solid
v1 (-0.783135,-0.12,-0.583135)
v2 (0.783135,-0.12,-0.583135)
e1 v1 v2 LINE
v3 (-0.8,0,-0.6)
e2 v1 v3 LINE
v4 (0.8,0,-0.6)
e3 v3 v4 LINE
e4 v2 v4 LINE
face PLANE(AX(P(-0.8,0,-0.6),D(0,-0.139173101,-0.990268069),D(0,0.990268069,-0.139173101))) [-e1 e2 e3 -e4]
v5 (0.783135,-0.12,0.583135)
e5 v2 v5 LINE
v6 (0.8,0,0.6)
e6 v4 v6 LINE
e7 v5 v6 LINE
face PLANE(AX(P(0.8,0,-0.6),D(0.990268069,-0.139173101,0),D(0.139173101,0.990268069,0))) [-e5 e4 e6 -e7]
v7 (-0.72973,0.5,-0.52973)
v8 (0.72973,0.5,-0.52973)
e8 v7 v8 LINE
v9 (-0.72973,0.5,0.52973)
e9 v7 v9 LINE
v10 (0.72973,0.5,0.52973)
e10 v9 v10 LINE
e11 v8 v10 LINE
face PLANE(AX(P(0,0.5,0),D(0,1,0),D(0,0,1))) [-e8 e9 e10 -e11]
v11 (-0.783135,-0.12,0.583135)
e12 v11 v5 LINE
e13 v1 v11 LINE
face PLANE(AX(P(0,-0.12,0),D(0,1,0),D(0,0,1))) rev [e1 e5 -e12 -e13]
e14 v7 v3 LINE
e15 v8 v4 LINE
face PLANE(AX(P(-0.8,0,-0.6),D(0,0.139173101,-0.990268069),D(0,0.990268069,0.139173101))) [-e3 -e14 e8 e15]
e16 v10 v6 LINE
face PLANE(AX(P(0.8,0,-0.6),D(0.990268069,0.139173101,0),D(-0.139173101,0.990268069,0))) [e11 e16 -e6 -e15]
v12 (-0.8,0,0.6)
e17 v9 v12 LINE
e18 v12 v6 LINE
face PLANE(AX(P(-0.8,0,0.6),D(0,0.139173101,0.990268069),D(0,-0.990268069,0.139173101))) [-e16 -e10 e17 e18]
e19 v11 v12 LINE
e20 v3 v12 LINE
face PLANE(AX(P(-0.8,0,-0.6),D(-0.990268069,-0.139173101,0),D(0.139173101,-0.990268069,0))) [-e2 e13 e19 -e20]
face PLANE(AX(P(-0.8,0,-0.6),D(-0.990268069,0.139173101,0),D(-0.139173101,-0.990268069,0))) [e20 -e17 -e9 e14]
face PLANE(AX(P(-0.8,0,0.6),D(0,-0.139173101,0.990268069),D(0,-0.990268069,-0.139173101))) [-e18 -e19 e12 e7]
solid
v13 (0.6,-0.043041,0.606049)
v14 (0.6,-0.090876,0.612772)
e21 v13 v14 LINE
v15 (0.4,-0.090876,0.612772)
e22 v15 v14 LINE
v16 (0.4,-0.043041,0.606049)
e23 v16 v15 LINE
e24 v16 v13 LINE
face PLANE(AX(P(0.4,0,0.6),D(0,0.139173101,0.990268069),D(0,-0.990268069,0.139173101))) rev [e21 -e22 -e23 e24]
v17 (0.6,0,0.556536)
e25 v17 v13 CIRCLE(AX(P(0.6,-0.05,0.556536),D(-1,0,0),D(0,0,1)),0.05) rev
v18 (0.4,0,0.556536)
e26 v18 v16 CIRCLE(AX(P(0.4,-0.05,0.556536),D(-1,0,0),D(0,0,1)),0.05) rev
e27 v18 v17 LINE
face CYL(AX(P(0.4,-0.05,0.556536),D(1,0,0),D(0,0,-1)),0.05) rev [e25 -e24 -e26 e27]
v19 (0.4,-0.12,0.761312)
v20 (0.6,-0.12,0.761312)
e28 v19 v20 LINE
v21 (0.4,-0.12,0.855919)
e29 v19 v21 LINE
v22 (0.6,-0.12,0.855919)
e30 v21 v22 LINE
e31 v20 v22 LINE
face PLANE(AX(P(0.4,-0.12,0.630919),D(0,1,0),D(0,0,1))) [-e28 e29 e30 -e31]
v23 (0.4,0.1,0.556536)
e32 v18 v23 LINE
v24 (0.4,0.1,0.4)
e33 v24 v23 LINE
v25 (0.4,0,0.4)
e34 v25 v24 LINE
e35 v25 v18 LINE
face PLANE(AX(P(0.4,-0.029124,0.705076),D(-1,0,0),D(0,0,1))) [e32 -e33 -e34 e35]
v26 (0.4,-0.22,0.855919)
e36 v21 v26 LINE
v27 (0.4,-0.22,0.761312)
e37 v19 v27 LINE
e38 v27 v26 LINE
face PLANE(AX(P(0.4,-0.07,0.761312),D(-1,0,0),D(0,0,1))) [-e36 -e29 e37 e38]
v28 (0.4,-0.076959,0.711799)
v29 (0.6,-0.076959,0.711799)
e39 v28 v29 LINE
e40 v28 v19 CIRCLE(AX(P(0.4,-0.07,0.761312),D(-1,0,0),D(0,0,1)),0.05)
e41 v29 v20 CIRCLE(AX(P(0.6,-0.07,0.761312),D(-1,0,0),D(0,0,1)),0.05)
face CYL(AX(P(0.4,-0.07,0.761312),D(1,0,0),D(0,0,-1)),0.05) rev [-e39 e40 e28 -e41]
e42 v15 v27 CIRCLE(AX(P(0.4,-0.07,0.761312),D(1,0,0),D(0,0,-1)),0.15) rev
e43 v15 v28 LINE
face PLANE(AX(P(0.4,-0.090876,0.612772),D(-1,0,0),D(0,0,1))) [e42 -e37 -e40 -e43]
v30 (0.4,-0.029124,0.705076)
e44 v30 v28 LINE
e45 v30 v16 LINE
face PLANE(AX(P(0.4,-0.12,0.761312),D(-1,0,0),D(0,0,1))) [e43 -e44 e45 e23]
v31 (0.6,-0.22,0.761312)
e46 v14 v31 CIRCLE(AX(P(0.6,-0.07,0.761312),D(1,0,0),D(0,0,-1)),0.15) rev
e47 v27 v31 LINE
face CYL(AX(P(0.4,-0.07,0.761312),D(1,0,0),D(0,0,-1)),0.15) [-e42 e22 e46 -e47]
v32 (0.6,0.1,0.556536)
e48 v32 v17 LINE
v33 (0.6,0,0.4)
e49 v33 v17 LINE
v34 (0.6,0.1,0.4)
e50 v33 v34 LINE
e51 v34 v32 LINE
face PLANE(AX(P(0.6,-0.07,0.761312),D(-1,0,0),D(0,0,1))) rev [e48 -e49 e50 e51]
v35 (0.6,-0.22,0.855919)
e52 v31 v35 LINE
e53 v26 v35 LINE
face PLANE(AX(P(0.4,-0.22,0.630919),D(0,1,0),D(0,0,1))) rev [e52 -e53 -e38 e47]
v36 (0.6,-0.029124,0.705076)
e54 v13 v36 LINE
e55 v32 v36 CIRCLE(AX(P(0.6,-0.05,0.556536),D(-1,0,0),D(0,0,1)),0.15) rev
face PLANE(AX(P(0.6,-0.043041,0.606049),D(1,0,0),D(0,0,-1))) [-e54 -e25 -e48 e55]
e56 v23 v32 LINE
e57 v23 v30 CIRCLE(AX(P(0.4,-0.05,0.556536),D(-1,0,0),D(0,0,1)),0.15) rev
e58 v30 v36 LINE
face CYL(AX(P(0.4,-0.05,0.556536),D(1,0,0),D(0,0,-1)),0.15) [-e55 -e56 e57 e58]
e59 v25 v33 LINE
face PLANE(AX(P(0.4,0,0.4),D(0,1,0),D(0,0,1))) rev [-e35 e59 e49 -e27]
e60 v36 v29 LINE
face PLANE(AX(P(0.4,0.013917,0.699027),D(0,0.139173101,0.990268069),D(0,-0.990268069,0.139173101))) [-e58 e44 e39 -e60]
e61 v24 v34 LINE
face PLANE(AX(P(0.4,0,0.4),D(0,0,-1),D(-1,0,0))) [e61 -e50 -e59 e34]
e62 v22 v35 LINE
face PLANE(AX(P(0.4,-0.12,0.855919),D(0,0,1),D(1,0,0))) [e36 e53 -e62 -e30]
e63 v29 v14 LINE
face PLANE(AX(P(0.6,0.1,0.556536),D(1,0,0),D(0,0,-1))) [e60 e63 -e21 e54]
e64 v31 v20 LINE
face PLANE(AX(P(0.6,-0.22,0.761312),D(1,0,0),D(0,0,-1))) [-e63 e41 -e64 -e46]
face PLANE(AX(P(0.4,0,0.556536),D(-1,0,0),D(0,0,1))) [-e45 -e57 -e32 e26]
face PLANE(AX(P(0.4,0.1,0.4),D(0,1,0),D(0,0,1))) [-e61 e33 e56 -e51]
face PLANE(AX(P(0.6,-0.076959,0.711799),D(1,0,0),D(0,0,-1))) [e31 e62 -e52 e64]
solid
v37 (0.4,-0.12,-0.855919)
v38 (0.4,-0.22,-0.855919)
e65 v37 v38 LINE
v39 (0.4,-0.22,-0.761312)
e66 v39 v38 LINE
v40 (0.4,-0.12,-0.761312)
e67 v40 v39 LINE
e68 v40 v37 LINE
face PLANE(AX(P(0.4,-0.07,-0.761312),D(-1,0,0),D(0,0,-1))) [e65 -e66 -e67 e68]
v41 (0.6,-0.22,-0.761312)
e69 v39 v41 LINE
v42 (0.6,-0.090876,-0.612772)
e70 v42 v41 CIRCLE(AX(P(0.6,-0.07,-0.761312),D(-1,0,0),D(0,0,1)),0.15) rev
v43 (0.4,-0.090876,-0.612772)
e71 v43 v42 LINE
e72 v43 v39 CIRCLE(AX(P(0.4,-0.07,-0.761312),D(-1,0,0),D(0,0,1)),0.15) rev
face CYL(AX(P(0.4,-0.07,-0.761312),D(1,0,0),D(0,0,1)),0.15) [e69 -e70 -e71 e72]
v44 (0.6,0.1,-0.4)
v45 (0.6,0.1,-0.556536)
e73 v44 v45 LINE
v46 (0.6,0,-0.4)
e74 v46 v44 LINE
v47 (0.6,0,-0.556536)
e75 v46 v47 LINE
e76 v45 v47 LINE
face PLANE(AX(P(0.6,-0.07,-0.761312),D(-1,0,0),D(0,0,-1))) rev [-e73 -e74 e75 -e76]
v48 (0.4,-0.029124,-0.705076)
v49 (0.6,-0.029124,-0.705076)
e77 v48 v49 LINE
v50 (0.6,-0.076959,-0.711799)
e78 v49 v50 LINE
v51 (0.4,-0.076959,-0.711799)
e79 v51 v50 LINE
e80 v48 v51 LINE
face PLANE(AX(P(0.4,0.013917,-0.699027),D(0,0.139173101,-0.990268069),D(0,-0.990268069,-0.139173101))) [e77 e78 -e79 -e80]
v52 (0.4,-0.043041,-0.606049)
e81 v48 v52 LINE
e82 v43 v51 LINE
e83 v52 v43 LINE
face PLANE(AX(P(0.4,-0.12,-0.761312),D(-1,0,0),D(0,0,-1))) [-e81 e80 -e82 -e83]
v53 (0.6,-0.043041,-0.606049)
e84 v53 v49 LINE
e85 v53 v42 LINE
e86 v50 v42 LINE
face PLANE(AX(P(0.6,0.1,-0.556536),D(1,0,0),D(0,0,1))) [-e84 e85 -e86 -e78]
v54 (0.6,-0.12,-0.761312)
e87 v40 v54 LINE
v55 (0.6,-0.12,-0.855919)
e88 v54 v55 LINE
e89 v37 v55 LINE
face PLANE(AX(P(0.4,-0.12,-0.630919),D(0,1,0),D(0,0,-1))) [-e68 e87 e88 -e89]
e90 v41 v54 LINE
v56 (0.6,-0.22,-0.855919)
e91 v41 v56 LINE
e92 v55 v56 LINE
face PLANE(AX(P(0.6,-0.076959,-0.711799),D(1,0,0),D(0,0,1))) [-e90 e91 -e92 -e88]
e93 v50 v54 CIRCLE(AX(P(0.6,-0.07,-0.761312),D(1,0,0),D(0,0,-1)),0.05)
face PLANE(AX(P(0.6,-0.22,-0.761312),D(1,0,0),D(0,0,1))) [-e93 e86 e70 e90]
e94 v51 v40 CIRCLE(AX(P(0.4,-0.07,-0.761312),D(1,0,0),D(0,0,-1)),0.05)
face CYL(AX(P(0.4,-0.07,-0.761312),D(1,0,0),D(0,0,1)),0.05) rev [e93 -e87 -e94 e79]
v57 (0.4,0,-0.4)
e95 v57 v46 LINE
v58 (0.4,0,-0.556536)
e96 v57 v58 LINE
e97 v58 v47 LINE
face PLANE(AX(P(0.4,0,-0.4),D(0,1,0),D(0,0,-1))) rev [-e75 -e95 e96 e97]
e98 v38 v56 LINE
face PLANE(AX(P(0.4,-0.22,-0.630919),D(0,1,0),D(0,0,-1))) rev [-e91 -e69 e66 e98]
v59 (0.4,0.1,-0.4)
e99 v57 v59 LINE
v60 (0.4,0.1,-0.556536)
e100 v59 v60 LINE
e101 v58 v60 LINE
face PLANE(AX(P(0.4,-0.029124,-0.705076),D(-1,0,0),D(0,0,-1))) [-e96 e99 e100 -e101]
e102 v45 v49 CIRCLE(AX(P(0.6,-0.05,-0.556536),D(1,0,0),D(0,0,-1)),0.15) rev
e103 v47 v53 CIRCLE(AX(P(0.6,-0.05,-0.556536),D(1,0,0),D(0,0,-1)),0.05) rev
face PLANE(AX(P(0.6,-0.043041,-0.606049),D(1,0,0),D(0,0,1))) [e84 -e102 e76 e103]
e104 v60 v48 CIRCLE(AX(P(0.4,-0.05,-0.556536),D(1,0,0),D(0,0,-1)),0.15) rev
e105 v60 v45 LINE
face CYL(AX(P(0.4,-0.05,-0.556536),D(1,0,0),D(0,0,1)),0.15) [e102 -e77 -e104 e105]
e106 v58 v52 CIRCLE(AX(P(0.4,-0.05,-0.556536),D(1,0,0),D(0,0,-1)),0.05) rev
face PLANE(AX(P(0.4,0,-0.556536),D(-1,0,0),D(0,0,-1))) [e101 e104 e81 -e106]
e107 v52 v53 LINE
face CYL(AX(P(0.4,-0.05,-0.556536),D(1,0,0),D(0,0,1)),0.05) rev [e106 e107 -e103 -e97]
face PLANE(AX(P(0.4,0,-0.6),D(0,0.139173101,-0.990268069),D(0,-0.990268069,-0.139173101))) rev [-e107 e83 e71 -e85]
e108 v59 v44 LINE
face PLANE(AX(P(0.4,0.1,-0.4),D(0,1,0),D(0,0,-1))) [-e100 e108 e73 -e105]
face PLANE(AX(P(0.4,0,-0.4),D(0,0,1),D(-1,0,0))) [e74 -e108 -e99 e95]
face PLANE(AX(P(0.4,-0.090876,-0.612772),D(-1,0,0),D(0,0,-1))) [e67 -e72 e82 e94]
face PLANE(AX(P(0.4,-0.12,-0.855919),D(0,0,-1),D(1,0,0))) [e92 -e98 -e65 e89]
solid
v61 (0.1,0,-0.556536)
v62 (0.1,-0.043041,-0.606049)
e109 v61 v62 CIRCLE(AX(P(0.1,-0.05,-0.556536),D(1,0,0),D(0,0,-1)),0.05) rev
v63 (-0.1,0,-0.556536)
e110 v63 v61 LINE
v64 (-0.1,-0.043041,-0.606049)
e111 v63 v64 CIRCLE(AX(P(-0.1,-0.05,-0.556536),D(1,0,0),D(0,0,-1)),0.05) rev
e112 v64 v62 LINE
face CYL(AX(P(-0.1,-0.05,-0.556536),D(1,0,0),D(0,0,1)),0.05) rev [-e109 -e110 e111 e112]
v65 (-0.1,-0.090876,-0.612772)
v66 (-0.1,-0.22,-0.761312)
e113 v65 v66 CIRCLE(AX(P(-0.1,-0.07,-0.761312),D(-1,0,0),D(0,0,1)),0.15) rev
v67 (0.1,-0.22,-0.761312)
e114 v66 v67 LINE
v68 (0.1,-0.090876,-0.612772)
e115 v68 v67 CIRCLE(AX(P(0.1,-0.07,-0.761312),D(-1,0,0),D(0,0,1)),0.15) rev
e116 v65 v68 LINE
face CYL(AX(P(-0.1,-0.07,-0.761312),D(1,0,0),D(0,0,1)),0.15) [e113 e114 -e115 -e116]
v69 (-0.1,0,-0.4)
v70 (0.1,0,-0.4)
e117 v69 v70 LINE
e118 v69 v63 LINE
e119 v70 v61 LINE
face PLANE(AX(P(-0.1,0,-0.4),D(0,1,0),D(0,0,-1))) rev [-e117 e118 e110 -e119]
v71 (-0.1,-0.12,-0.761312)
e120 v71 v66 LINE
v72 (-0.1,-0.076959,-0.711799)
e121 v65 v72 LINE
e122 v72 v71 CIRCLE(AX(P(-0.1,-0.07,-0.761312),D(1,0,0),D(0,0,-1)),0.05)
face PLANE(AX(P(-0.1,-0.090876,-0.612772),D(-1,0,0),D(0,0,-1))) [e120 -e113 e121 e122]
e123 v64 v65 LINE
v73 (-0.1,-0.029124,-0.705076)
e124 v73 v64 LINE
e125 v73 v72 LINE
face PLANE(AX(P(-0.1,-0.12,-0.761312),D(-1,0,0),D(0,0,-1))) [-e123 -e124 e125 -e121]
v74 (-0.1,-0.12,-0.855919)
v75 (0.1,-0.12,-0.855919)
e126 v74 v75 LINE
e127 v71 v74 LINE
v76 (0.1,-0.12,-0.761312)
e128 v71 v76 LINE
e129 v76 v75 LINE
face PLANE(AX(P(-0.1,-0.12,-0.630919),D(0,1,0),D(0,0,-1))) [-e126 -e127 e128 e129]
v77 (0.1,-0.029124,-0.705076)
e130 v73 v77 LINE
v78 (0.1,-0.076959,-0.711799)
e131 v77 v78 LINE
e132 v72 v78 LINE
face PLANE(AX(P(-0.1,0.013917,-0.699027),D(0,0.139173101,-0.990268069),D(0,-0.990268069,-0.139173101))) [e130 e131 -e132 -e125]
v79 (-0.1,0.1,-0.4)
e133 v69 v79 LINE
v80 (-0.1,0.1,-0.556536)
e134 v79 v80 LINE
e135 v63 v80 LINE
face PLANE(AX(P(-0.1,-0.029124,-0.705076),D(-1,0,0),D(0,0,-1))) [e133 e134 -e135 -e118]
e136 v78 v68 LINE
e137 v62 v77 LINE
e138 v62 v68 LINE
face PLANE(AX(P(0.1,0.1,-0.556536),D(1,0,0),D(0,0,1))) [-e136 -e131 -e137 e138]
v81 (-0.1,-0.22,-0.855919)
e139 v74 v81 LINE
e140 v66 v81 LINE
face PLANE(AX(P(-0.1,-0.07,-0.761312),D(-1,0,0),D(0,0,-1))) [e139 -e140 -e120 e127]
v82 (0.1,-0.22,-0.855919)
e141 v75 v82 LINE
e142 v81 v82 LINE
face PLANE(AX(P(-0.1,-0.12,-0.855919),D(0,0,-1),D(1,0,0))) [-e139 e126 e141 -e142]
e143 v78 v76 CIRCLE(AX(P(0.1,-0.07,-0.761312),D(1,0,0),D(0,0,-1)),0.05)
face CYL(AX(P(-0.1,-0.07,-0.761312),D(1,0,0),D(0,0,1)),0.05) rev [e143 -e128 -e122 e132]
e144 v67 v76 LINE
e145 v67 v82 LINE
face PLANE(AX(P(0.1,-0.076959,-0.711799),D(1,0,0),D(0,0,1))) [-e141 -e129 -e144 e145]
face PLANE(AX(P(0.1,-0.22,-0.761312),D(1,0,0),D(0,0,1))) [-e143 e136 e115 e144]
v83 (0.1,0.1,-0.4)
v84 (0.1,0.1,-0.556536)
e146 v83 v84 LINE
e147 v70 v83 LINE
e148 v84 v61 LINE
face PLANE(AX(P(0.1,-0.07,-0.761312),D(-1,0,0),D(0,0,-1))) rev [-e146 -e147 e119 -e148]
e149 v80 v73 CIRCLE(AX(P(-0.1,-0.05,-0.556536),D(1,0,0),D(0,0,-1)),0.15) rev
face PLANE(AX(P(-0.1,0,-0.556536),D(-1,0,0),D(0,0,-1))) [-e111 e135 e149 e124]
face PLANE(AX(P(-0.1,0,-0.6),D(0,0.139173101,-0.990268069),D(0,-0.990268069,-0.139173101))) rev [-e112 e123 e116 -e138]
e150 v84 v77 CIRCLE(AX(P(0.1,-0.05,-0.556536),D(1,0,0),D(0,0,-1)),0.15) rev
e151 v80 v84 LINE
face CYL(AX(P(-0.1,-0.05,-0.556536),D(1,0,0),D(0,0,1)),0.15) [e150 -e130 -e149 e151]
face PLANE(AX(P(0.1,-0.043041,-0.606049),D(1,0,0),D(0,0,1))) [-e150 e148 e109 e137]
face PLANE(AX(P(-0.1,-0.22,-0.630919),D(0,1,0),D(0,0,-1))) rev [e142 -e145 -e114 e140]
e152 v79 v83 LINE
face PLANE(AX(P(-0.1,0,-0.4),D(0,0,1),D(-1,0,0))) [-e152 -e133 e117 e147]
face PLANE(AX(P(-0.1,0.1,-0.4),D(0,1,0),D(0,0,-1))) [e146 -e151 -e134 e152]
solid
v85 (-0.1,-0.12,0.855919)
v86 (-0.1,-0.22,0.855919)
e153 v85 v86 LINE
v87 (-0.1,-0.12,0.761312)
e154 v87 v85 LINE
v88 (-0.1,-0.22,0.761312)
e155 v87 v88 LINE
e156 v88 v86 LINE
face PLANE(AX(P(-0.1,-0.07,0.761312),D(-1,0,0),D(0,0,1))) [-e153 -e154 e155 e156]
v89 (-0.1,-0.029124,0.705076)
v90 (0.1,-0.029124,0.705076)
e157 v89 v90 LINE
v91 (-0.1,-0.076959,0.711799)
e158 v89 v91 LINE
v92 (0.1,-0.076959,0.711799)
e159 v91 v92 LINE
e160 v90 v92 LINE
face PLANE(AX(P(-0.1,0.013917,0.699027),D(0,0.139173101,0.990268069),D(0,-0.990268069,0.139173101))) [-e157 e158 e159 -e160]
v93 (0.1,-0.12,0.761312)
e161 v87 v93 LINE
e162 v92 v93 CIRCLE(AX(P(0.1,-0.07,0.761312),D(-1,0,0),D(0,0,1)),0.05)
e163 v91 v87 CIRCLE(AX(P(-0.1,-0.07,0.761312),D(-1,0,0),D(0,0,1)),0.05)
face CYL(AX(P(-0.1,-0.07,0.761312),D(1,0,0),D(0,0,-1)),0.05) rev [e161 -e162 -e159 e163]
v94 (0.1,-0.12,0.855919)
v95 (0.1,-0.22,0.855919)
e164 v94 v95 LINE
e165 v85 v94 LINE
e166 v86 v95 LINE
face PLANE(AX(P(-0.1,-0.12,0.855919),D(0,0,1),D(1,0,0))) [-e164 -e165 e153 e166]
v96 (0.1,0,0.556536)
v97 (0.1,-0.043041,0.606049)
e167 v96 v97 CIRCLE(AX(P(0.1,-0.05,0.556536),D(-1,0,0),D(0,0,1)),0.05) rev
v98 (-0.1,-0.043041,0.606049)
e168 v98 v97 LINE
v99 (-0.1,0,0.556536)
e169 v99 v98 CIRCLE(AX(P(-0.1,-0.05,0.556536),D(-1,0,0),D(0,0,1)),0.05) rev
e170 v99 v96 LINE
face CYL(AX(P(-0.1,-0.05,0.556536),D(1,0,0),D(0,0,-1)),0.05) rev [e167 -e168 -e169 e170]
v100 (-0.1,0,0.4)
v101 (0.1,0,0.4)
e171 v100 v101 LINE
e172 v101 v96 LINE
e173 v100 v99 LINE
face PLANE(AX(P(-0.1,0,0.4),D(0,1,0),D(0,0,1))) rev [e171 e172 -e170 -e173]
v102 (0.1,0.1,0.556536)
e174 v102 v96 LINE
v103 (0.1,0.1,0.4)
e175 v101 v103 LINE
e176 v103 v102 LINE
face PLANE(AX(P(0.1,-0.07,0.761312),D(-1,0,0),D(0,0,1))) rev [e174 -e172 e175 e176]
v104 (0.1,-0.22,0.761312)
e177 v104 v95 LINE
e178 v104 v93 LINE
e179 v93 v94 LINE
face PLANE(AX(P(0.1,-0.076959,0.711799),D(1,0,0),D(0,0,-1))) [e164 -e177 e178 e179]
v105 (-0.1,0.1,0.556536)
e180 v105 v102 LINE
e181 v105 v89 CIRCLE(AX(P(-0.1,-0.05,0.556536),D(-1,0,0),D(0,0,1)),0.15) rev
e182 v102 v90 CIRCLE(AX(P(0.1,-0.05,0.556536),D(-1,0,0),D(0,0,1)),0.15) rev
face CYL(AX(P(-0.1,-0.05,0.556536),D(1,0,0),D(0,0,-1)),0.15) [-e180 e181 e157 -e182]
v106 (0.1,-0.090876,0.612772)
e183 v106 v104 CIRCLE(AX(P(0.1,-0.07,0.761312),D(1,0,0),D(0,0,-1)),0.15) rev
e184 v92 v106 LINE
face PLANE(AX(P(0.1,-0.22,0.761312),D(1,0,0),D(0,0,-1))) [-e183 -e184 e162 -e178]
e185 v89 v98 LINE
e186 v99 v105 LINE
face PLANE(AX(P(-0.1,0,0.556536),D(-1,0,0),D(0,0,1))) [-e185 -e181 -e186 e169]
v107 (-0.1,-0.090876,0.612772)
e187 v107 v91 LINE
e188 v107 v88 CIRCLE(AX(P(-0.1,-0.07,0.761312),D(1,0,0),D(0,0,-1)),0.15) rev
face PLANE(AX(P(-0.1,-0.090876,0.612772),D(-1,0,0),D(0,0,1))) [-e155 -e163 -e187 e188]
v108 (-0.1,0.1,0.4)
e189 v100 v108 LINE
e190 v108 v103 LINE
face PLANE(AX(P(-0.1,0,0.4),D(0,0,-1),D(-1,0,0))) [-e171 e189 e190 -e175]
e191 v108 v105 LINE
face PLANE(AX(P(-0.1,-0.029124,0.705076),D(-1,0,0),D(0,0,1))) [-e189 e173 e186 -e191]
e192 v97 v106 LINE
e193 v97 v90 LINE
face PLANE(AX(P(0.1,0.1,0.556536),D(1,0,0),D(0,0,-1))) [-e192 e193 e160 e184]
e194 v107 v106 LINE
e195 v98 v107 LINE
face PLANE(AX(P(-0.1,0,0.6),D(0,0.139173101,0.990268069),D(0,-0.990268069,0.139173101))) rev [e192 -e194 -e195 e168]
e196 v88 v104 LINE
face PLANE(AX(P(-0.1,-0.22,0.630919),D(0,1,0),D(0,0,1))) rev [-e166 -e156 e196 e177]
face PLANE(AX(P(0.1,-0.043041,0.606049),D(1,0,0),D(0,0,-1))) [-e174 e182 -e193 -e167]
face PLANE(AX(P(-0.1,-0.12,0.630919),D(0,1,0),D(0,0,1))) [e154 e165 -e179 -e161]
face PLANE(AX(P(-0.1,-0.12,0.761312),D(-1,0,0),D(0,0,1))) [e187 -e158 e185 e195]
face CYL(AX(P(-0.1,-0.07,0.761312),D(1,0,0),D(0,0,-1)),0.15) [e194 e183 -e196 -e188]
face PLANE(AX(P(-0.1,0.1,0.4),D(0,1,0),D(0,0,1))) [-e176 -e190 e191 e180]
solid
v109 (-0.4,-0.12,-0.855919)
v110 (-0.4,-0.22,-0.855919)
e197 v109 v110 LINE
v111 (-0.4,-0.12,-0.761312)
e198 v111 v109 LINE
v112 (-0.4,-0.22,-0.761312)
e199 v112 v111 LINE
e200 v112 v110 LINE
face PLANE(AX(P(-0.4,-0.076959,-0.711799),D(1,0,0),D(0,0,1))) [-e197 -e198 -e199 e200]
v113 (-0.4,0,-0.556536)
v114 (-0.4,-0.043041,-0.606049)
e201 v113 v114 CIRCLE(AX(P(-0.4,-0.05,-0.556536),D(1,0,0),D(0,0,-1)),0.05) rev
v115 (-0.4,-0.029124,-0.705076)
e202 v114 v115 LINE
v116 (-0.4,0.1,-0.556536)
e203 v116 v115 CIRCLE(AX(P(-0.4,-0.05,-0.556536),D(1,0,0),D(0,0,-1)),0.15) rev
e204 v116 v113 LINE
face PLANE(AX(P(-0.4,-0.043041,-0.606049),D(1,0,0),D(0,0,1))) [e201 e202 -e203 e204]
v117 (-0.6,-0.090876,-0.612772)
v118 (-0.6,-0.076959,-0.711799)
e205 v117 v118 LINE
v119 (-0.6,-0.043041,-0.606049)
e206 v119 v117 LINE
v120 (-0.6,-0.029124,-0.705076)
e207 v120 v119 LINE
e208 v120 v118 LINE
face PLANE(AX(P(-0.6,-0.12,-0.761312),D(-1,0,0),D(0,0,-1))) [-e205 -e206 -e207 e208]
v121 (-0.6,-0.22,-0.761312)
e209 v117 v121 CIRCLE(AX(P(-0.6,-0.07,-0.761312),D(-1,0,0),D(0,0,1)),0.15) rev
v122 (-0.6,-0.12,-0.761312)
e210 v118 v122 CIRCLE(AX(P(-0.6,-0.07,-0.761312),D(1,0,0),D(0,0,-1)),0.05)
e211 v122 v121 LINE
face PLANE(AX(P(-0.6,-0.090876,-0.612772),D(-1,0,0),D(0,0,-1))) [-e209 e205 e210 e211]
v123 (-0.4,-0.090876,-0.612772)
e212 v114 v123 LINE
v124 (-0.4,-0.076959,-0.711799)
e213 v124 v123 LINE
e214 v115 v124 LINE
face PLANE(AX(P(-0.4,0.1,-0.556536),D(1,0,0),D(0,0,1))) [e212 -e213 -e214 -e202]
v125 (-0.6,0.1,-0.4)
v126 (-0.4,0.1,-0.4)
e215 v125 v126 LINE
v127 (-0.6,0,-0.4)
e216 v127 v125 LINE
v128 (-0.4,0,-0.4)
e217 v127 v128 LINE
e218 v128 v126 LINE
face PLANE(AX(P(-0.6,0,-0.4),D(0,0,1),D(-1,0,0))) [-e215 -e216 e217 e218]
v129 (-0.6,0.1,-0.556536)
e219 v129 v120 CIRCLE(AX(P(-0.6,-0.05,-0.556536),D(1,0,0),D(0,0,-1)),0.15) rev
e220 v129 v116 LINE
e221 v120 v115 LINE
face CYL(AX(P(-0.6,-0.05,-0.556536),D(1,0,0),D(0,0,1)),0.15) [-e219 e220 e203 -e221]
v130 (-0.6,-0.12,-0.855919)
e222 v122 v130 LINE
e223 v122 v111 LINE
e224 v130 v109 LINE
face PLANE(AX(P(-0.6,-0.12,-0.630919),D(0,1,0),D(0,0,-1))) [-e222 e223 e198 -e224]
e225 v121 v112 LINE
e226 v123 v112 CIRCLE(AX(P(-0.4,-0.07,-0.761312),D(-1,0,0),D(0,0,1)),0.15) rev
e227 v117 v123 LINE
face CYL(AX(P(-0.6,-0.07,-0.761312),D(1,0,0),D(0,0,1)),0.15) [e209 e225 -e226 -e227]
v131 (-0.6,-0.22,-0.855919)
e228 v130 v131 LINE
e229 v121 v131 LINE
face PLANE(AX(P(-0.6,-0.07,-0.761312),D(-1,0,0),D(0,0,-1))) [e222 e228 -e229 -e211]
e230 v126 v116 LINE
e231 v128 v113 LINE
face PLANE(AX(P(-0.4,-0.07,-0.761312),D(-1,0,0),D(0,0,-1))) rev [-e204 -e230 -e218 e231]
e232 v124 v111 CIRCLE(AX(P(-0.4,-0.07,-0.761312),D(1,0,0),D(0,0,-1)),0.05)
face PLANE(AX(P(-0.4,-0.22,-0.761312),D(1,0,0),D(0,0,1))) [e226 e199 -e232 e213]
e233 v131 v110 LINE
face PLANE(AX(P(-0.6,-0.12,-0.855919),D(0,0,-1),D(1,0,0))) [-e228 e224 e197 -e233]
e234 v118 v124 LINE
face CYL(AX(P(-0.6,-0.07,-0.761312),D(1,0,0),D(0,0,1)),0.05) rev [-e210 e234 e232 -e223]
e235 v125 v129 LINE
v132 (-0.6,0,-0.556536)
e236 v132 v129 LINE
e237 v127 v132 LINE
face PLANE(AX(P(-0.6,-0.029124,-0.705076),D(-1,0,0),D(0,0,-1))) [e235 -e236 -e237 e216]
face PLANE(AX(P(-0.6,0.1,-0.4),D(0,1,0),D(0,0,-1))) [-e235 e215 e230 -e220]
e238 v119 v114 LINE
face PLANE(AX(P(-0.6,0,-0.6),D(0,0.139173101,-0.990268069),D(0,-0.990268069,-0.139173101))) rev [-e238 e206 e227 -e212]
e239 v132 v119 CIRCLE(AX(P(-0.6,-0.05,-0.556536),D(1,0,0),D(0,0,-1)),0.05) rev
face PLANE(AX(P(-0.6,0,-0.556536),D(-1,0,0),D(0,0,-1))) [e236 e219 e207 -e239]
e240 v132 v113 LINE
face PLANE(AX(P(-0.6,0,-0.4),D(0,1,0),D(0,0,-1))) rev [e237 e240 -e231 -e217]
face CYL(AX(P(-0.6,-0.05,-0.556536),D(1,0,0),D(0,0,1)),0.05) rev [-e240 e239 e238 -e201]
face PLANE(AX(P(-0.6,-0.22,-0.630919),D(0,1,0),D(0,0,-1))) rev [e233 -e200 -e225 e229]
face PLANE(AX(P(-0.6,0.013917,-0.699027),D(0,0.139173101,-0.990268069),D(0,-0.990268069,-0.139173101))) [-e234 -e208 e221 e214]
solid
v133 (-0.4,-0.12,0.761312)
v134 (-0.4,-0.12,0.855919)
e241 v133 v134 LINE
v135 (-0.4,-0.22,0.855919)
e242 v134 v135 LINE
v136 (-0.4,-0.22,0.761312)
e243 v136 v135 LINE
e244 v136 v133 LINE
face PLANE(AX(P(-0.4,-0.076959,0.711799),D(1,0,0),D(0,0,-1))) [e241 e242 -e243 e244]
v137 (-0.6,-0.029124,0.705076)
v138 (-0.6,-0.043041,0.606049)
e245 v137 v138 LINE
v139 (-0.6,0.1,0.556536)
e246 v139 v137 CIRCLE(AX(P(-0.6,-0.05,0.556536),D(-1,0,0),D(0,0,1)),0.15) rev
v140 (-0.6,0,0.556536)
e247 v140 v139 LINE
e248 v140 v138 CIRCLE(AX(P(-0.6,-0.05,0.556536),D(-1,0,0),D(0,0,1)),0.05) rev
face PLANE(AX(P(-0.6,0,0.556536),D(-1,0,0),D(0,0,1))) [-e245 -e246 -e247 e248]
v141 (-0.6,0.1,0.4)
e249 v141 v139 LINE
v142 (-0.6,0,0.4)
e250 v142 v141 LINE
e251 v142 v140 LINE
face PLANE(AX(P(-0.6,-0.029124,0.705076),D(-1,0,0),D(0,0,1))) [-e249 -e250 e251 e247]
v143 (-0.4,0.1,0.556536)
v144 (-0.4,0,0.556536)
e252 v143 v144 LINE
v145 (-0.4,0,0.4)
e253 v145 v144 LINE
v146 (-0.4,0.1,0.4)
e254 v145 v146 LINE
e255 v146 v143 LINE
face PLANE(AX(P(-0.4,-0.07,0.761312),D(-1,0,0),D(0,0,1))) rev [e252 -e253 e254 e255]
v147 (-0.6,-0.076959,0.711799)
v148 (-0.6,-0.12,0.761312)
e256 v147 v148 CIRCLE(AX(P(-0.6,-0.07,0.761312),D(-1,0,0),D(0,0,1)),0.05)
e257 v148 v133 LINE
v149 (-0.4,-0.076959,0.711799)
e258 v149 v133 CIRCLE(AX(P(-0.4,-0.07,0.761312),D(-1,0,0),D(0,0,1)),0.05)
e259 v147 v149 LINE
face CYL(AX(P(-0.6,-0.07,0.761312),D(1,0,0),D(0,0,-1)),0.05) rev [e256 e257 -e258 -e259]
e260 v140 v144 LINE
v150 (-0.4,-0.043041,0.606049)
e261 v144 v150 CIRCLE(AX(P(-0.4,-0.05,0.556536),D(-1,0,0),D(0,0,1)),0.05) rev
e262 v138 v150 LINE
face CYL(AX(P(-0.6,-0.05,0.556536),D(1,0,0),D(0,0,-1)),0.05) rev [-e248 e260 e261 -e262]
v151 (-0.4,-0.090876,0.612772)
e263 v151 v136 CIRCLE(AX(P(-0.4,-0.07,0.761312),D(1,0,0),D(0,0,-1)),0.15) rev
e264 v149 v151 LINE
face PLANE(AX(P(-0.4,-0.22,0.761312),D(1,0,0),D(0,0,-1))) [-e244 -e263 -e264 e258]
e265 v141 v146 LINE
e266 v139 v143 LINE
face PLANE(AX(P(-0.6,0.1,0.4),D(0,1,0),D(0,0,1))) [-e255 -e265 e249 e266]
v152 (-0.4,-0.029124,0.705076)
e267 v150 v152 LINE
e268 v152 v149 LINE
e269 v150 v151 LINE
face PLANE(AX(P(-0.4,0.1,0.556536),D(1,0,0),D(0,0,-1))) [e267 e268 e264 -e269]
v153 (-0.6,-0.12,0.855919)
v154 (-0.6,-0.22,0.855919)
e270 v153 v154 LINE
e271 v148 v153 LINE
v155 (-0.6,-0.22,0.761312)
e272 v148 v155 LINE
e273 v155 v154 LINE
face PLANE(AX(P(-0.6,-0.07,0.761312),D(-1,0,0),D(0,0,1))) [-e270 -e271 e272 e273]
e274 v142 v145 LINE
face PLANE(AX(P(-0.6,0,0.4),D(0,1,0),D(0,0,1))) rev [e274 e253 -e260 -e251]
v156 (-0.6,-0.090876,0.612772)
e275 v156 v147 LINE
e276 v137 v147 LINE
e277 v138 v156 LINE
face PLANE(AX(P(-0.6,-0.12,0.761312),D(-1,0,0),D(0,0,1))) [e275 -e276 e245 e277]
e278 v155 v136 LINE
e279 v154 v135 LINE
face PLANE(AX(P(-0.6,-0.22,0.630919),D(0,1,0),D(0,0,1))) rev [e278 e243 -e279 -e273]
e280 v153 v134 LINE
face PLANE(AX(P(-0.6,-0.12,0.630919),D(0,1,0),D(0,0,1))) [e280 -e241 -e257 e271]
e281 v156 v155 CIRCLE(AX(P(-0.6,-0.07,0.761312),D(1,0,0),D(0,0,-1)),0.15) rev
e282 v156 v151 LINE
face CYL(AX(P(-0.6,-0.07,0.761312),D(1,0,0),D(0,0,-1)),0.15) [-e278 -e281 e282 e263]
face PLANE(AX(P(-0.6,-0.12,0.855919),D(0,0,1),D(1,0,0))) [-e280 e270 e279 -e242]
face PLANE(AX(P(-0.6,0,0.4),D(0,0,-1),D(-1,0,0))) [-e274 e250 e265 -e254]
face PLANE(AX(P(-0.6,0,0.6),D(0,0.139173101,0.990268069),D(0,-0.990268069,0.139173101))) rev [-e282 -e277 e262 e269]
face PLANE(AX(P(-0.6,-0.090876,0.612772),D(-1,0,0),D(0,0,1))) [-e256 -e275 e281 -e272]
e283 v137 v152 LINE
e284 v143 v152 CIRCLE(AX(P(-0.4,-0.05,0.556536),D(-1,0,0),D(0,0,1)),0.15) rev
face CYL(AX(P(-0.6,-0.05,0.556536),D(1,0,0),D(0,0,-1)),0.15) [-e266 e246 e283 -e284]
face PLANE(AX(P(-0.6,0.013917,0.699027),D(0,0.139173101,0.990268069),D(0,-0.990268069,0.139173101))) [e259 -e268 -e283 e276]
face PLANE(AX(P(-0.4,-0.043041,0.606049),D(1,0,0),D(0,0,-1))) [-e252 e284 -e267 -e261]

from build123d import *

# Parameters (mm, degrees)
SKETCH1_W                     = 1.6
SKETCH1_H                     = 1.2
BOSS_EXTRUDE1_DEPTH           = 0.5
BOSS_EXTRUDE1_TAPER           = 8
BOSS_EXTRUDE1_OTHER_WAY_DEPTH = 0.12
BOSS_EXTRUDE1_OTHER_WAY_TAPER = 8
BASE_FLANGE2_DEPTH            = 0.1
LPATTERN1_COUNT               = 2
LPATTERN1_PITCH               = 0.5
LPATTERN1_2_COUNT             = 2
LPATTERN1_2_PITCH             = 0.5


# Sheet-metal steps are written as plain solids
with BuildPart() as part:
    # Sketch1 → Boss-Extrude1 (new body)
    with BuildSketch(Plane(origin=(0, 0, 0), x_dir=(1, 0, 0), z_dir=(0, 1, 0))):
        Rectangle(SKETCH1_W, SKETCH1_H)
    extrude(amount=BOSS_EXTRUDE1_DEPTH, taper=BOSS_EXTRUDE1_TAPER)

    # Sketch1 → Boss-Extrude1 other way (add)
    with BuildSketch(Plane(origin=(0, 0, 0), x_dir=(1, 0, 0), z_dir=(0, 1, 0))):
        Rectangle(SKETCH1_W, SKETCH1_H)
    extrude(amount=-BOSS_EXTRUDE1_OTHER_WAY_DEPTH, taper=BOSS_EXTRUDE1_OTHER_WAY_TAPER)


with BuildPart() as body_2:
    # Sketch2 → Base-Flange2 (new, symmetric)
    with BuildSketch(Plane.ZY):
        with BuildLine():
            Line((0.4, 0), (0.556535663, 0))
            ThreePointArc((0.556535663, 0), (0.589338615, -0.012264521), (0.606049067, -0.043041345))
            Line((0.606049067, -0.043041345), (0.612771784, -0.090875965))
            ThreePointArc((0.612771784, -0.090875965), (0.66290314, -0.183206437), (0.761311994, -0.22))
            Line((0.761311994, -0.22), (0.855918984, -0.22))
            Line((0.855918984, -0.22), (0.855918984, -0.12))
            Line((0.855918984, -0.12), (0.761311994, -0.12))
            ThreePointArc((0.761311994, -0.12), (0.728509043, -0.107735479), (0.711798591, -0.076958655))
            Line((0.711798591, -0.076958655), (0.705075873, -0.029124035))
            ThreePointArc((0.705075873, -0.029124035), (0.654944517, 0.063206437), (0.556535663, 0.1))
            Line((0.556535663, 0.1), (0.4, 0.1))
            Line((0.4, 0.1), (0.4, 0))
        make_face()
    extrude(amount=BASE_FLANGE2_DEPTH, both=True)


with BuildPart() as lpattern1_1:
    # LPattern1: pattern copy
    add(body_2.part.moved(Location(Vector(1, 0, 0) * (1 * LPATTERN1_PITCH))))


with BuildPart() as lpattern1_2_1:
    # LPattern1 2: pattern copy
    add(body_2.part.moved(Location(Vector(-1, 0, 0) * (1 * LPATTERN1_2_PITCH))))


with BuildPart() as body_5:
    # Mirror1: mirrored copy
    add(lpattern1_2_1.part.mirror(Plane(origin=(0, 0, 0), x_dir=(1, 0, 0), z_dir=(0, 0, -1))))


with BuildPart() as body_6:
    # Mirror1 2: mirrored copy
    add(body_2.part.mirror(Plane(origin=(0, 0, 0), x_dir=(1, 0, 0), z_dir=(0, 0, -1))))


with BuildPart() as body_7:
    # Mirror1 3: mirrored copy
    add(lpattern1_1.part.mirror(Plane(origin=(0, 0, 0), x_dir=(1, 0, 0), z_dir=(0, 0, -1))))


solid = Compound([part.part, body_2.part, lpattern1_1.part, lpattern1_2_1.part, body_5.part, body_6.part, body_7.part])
